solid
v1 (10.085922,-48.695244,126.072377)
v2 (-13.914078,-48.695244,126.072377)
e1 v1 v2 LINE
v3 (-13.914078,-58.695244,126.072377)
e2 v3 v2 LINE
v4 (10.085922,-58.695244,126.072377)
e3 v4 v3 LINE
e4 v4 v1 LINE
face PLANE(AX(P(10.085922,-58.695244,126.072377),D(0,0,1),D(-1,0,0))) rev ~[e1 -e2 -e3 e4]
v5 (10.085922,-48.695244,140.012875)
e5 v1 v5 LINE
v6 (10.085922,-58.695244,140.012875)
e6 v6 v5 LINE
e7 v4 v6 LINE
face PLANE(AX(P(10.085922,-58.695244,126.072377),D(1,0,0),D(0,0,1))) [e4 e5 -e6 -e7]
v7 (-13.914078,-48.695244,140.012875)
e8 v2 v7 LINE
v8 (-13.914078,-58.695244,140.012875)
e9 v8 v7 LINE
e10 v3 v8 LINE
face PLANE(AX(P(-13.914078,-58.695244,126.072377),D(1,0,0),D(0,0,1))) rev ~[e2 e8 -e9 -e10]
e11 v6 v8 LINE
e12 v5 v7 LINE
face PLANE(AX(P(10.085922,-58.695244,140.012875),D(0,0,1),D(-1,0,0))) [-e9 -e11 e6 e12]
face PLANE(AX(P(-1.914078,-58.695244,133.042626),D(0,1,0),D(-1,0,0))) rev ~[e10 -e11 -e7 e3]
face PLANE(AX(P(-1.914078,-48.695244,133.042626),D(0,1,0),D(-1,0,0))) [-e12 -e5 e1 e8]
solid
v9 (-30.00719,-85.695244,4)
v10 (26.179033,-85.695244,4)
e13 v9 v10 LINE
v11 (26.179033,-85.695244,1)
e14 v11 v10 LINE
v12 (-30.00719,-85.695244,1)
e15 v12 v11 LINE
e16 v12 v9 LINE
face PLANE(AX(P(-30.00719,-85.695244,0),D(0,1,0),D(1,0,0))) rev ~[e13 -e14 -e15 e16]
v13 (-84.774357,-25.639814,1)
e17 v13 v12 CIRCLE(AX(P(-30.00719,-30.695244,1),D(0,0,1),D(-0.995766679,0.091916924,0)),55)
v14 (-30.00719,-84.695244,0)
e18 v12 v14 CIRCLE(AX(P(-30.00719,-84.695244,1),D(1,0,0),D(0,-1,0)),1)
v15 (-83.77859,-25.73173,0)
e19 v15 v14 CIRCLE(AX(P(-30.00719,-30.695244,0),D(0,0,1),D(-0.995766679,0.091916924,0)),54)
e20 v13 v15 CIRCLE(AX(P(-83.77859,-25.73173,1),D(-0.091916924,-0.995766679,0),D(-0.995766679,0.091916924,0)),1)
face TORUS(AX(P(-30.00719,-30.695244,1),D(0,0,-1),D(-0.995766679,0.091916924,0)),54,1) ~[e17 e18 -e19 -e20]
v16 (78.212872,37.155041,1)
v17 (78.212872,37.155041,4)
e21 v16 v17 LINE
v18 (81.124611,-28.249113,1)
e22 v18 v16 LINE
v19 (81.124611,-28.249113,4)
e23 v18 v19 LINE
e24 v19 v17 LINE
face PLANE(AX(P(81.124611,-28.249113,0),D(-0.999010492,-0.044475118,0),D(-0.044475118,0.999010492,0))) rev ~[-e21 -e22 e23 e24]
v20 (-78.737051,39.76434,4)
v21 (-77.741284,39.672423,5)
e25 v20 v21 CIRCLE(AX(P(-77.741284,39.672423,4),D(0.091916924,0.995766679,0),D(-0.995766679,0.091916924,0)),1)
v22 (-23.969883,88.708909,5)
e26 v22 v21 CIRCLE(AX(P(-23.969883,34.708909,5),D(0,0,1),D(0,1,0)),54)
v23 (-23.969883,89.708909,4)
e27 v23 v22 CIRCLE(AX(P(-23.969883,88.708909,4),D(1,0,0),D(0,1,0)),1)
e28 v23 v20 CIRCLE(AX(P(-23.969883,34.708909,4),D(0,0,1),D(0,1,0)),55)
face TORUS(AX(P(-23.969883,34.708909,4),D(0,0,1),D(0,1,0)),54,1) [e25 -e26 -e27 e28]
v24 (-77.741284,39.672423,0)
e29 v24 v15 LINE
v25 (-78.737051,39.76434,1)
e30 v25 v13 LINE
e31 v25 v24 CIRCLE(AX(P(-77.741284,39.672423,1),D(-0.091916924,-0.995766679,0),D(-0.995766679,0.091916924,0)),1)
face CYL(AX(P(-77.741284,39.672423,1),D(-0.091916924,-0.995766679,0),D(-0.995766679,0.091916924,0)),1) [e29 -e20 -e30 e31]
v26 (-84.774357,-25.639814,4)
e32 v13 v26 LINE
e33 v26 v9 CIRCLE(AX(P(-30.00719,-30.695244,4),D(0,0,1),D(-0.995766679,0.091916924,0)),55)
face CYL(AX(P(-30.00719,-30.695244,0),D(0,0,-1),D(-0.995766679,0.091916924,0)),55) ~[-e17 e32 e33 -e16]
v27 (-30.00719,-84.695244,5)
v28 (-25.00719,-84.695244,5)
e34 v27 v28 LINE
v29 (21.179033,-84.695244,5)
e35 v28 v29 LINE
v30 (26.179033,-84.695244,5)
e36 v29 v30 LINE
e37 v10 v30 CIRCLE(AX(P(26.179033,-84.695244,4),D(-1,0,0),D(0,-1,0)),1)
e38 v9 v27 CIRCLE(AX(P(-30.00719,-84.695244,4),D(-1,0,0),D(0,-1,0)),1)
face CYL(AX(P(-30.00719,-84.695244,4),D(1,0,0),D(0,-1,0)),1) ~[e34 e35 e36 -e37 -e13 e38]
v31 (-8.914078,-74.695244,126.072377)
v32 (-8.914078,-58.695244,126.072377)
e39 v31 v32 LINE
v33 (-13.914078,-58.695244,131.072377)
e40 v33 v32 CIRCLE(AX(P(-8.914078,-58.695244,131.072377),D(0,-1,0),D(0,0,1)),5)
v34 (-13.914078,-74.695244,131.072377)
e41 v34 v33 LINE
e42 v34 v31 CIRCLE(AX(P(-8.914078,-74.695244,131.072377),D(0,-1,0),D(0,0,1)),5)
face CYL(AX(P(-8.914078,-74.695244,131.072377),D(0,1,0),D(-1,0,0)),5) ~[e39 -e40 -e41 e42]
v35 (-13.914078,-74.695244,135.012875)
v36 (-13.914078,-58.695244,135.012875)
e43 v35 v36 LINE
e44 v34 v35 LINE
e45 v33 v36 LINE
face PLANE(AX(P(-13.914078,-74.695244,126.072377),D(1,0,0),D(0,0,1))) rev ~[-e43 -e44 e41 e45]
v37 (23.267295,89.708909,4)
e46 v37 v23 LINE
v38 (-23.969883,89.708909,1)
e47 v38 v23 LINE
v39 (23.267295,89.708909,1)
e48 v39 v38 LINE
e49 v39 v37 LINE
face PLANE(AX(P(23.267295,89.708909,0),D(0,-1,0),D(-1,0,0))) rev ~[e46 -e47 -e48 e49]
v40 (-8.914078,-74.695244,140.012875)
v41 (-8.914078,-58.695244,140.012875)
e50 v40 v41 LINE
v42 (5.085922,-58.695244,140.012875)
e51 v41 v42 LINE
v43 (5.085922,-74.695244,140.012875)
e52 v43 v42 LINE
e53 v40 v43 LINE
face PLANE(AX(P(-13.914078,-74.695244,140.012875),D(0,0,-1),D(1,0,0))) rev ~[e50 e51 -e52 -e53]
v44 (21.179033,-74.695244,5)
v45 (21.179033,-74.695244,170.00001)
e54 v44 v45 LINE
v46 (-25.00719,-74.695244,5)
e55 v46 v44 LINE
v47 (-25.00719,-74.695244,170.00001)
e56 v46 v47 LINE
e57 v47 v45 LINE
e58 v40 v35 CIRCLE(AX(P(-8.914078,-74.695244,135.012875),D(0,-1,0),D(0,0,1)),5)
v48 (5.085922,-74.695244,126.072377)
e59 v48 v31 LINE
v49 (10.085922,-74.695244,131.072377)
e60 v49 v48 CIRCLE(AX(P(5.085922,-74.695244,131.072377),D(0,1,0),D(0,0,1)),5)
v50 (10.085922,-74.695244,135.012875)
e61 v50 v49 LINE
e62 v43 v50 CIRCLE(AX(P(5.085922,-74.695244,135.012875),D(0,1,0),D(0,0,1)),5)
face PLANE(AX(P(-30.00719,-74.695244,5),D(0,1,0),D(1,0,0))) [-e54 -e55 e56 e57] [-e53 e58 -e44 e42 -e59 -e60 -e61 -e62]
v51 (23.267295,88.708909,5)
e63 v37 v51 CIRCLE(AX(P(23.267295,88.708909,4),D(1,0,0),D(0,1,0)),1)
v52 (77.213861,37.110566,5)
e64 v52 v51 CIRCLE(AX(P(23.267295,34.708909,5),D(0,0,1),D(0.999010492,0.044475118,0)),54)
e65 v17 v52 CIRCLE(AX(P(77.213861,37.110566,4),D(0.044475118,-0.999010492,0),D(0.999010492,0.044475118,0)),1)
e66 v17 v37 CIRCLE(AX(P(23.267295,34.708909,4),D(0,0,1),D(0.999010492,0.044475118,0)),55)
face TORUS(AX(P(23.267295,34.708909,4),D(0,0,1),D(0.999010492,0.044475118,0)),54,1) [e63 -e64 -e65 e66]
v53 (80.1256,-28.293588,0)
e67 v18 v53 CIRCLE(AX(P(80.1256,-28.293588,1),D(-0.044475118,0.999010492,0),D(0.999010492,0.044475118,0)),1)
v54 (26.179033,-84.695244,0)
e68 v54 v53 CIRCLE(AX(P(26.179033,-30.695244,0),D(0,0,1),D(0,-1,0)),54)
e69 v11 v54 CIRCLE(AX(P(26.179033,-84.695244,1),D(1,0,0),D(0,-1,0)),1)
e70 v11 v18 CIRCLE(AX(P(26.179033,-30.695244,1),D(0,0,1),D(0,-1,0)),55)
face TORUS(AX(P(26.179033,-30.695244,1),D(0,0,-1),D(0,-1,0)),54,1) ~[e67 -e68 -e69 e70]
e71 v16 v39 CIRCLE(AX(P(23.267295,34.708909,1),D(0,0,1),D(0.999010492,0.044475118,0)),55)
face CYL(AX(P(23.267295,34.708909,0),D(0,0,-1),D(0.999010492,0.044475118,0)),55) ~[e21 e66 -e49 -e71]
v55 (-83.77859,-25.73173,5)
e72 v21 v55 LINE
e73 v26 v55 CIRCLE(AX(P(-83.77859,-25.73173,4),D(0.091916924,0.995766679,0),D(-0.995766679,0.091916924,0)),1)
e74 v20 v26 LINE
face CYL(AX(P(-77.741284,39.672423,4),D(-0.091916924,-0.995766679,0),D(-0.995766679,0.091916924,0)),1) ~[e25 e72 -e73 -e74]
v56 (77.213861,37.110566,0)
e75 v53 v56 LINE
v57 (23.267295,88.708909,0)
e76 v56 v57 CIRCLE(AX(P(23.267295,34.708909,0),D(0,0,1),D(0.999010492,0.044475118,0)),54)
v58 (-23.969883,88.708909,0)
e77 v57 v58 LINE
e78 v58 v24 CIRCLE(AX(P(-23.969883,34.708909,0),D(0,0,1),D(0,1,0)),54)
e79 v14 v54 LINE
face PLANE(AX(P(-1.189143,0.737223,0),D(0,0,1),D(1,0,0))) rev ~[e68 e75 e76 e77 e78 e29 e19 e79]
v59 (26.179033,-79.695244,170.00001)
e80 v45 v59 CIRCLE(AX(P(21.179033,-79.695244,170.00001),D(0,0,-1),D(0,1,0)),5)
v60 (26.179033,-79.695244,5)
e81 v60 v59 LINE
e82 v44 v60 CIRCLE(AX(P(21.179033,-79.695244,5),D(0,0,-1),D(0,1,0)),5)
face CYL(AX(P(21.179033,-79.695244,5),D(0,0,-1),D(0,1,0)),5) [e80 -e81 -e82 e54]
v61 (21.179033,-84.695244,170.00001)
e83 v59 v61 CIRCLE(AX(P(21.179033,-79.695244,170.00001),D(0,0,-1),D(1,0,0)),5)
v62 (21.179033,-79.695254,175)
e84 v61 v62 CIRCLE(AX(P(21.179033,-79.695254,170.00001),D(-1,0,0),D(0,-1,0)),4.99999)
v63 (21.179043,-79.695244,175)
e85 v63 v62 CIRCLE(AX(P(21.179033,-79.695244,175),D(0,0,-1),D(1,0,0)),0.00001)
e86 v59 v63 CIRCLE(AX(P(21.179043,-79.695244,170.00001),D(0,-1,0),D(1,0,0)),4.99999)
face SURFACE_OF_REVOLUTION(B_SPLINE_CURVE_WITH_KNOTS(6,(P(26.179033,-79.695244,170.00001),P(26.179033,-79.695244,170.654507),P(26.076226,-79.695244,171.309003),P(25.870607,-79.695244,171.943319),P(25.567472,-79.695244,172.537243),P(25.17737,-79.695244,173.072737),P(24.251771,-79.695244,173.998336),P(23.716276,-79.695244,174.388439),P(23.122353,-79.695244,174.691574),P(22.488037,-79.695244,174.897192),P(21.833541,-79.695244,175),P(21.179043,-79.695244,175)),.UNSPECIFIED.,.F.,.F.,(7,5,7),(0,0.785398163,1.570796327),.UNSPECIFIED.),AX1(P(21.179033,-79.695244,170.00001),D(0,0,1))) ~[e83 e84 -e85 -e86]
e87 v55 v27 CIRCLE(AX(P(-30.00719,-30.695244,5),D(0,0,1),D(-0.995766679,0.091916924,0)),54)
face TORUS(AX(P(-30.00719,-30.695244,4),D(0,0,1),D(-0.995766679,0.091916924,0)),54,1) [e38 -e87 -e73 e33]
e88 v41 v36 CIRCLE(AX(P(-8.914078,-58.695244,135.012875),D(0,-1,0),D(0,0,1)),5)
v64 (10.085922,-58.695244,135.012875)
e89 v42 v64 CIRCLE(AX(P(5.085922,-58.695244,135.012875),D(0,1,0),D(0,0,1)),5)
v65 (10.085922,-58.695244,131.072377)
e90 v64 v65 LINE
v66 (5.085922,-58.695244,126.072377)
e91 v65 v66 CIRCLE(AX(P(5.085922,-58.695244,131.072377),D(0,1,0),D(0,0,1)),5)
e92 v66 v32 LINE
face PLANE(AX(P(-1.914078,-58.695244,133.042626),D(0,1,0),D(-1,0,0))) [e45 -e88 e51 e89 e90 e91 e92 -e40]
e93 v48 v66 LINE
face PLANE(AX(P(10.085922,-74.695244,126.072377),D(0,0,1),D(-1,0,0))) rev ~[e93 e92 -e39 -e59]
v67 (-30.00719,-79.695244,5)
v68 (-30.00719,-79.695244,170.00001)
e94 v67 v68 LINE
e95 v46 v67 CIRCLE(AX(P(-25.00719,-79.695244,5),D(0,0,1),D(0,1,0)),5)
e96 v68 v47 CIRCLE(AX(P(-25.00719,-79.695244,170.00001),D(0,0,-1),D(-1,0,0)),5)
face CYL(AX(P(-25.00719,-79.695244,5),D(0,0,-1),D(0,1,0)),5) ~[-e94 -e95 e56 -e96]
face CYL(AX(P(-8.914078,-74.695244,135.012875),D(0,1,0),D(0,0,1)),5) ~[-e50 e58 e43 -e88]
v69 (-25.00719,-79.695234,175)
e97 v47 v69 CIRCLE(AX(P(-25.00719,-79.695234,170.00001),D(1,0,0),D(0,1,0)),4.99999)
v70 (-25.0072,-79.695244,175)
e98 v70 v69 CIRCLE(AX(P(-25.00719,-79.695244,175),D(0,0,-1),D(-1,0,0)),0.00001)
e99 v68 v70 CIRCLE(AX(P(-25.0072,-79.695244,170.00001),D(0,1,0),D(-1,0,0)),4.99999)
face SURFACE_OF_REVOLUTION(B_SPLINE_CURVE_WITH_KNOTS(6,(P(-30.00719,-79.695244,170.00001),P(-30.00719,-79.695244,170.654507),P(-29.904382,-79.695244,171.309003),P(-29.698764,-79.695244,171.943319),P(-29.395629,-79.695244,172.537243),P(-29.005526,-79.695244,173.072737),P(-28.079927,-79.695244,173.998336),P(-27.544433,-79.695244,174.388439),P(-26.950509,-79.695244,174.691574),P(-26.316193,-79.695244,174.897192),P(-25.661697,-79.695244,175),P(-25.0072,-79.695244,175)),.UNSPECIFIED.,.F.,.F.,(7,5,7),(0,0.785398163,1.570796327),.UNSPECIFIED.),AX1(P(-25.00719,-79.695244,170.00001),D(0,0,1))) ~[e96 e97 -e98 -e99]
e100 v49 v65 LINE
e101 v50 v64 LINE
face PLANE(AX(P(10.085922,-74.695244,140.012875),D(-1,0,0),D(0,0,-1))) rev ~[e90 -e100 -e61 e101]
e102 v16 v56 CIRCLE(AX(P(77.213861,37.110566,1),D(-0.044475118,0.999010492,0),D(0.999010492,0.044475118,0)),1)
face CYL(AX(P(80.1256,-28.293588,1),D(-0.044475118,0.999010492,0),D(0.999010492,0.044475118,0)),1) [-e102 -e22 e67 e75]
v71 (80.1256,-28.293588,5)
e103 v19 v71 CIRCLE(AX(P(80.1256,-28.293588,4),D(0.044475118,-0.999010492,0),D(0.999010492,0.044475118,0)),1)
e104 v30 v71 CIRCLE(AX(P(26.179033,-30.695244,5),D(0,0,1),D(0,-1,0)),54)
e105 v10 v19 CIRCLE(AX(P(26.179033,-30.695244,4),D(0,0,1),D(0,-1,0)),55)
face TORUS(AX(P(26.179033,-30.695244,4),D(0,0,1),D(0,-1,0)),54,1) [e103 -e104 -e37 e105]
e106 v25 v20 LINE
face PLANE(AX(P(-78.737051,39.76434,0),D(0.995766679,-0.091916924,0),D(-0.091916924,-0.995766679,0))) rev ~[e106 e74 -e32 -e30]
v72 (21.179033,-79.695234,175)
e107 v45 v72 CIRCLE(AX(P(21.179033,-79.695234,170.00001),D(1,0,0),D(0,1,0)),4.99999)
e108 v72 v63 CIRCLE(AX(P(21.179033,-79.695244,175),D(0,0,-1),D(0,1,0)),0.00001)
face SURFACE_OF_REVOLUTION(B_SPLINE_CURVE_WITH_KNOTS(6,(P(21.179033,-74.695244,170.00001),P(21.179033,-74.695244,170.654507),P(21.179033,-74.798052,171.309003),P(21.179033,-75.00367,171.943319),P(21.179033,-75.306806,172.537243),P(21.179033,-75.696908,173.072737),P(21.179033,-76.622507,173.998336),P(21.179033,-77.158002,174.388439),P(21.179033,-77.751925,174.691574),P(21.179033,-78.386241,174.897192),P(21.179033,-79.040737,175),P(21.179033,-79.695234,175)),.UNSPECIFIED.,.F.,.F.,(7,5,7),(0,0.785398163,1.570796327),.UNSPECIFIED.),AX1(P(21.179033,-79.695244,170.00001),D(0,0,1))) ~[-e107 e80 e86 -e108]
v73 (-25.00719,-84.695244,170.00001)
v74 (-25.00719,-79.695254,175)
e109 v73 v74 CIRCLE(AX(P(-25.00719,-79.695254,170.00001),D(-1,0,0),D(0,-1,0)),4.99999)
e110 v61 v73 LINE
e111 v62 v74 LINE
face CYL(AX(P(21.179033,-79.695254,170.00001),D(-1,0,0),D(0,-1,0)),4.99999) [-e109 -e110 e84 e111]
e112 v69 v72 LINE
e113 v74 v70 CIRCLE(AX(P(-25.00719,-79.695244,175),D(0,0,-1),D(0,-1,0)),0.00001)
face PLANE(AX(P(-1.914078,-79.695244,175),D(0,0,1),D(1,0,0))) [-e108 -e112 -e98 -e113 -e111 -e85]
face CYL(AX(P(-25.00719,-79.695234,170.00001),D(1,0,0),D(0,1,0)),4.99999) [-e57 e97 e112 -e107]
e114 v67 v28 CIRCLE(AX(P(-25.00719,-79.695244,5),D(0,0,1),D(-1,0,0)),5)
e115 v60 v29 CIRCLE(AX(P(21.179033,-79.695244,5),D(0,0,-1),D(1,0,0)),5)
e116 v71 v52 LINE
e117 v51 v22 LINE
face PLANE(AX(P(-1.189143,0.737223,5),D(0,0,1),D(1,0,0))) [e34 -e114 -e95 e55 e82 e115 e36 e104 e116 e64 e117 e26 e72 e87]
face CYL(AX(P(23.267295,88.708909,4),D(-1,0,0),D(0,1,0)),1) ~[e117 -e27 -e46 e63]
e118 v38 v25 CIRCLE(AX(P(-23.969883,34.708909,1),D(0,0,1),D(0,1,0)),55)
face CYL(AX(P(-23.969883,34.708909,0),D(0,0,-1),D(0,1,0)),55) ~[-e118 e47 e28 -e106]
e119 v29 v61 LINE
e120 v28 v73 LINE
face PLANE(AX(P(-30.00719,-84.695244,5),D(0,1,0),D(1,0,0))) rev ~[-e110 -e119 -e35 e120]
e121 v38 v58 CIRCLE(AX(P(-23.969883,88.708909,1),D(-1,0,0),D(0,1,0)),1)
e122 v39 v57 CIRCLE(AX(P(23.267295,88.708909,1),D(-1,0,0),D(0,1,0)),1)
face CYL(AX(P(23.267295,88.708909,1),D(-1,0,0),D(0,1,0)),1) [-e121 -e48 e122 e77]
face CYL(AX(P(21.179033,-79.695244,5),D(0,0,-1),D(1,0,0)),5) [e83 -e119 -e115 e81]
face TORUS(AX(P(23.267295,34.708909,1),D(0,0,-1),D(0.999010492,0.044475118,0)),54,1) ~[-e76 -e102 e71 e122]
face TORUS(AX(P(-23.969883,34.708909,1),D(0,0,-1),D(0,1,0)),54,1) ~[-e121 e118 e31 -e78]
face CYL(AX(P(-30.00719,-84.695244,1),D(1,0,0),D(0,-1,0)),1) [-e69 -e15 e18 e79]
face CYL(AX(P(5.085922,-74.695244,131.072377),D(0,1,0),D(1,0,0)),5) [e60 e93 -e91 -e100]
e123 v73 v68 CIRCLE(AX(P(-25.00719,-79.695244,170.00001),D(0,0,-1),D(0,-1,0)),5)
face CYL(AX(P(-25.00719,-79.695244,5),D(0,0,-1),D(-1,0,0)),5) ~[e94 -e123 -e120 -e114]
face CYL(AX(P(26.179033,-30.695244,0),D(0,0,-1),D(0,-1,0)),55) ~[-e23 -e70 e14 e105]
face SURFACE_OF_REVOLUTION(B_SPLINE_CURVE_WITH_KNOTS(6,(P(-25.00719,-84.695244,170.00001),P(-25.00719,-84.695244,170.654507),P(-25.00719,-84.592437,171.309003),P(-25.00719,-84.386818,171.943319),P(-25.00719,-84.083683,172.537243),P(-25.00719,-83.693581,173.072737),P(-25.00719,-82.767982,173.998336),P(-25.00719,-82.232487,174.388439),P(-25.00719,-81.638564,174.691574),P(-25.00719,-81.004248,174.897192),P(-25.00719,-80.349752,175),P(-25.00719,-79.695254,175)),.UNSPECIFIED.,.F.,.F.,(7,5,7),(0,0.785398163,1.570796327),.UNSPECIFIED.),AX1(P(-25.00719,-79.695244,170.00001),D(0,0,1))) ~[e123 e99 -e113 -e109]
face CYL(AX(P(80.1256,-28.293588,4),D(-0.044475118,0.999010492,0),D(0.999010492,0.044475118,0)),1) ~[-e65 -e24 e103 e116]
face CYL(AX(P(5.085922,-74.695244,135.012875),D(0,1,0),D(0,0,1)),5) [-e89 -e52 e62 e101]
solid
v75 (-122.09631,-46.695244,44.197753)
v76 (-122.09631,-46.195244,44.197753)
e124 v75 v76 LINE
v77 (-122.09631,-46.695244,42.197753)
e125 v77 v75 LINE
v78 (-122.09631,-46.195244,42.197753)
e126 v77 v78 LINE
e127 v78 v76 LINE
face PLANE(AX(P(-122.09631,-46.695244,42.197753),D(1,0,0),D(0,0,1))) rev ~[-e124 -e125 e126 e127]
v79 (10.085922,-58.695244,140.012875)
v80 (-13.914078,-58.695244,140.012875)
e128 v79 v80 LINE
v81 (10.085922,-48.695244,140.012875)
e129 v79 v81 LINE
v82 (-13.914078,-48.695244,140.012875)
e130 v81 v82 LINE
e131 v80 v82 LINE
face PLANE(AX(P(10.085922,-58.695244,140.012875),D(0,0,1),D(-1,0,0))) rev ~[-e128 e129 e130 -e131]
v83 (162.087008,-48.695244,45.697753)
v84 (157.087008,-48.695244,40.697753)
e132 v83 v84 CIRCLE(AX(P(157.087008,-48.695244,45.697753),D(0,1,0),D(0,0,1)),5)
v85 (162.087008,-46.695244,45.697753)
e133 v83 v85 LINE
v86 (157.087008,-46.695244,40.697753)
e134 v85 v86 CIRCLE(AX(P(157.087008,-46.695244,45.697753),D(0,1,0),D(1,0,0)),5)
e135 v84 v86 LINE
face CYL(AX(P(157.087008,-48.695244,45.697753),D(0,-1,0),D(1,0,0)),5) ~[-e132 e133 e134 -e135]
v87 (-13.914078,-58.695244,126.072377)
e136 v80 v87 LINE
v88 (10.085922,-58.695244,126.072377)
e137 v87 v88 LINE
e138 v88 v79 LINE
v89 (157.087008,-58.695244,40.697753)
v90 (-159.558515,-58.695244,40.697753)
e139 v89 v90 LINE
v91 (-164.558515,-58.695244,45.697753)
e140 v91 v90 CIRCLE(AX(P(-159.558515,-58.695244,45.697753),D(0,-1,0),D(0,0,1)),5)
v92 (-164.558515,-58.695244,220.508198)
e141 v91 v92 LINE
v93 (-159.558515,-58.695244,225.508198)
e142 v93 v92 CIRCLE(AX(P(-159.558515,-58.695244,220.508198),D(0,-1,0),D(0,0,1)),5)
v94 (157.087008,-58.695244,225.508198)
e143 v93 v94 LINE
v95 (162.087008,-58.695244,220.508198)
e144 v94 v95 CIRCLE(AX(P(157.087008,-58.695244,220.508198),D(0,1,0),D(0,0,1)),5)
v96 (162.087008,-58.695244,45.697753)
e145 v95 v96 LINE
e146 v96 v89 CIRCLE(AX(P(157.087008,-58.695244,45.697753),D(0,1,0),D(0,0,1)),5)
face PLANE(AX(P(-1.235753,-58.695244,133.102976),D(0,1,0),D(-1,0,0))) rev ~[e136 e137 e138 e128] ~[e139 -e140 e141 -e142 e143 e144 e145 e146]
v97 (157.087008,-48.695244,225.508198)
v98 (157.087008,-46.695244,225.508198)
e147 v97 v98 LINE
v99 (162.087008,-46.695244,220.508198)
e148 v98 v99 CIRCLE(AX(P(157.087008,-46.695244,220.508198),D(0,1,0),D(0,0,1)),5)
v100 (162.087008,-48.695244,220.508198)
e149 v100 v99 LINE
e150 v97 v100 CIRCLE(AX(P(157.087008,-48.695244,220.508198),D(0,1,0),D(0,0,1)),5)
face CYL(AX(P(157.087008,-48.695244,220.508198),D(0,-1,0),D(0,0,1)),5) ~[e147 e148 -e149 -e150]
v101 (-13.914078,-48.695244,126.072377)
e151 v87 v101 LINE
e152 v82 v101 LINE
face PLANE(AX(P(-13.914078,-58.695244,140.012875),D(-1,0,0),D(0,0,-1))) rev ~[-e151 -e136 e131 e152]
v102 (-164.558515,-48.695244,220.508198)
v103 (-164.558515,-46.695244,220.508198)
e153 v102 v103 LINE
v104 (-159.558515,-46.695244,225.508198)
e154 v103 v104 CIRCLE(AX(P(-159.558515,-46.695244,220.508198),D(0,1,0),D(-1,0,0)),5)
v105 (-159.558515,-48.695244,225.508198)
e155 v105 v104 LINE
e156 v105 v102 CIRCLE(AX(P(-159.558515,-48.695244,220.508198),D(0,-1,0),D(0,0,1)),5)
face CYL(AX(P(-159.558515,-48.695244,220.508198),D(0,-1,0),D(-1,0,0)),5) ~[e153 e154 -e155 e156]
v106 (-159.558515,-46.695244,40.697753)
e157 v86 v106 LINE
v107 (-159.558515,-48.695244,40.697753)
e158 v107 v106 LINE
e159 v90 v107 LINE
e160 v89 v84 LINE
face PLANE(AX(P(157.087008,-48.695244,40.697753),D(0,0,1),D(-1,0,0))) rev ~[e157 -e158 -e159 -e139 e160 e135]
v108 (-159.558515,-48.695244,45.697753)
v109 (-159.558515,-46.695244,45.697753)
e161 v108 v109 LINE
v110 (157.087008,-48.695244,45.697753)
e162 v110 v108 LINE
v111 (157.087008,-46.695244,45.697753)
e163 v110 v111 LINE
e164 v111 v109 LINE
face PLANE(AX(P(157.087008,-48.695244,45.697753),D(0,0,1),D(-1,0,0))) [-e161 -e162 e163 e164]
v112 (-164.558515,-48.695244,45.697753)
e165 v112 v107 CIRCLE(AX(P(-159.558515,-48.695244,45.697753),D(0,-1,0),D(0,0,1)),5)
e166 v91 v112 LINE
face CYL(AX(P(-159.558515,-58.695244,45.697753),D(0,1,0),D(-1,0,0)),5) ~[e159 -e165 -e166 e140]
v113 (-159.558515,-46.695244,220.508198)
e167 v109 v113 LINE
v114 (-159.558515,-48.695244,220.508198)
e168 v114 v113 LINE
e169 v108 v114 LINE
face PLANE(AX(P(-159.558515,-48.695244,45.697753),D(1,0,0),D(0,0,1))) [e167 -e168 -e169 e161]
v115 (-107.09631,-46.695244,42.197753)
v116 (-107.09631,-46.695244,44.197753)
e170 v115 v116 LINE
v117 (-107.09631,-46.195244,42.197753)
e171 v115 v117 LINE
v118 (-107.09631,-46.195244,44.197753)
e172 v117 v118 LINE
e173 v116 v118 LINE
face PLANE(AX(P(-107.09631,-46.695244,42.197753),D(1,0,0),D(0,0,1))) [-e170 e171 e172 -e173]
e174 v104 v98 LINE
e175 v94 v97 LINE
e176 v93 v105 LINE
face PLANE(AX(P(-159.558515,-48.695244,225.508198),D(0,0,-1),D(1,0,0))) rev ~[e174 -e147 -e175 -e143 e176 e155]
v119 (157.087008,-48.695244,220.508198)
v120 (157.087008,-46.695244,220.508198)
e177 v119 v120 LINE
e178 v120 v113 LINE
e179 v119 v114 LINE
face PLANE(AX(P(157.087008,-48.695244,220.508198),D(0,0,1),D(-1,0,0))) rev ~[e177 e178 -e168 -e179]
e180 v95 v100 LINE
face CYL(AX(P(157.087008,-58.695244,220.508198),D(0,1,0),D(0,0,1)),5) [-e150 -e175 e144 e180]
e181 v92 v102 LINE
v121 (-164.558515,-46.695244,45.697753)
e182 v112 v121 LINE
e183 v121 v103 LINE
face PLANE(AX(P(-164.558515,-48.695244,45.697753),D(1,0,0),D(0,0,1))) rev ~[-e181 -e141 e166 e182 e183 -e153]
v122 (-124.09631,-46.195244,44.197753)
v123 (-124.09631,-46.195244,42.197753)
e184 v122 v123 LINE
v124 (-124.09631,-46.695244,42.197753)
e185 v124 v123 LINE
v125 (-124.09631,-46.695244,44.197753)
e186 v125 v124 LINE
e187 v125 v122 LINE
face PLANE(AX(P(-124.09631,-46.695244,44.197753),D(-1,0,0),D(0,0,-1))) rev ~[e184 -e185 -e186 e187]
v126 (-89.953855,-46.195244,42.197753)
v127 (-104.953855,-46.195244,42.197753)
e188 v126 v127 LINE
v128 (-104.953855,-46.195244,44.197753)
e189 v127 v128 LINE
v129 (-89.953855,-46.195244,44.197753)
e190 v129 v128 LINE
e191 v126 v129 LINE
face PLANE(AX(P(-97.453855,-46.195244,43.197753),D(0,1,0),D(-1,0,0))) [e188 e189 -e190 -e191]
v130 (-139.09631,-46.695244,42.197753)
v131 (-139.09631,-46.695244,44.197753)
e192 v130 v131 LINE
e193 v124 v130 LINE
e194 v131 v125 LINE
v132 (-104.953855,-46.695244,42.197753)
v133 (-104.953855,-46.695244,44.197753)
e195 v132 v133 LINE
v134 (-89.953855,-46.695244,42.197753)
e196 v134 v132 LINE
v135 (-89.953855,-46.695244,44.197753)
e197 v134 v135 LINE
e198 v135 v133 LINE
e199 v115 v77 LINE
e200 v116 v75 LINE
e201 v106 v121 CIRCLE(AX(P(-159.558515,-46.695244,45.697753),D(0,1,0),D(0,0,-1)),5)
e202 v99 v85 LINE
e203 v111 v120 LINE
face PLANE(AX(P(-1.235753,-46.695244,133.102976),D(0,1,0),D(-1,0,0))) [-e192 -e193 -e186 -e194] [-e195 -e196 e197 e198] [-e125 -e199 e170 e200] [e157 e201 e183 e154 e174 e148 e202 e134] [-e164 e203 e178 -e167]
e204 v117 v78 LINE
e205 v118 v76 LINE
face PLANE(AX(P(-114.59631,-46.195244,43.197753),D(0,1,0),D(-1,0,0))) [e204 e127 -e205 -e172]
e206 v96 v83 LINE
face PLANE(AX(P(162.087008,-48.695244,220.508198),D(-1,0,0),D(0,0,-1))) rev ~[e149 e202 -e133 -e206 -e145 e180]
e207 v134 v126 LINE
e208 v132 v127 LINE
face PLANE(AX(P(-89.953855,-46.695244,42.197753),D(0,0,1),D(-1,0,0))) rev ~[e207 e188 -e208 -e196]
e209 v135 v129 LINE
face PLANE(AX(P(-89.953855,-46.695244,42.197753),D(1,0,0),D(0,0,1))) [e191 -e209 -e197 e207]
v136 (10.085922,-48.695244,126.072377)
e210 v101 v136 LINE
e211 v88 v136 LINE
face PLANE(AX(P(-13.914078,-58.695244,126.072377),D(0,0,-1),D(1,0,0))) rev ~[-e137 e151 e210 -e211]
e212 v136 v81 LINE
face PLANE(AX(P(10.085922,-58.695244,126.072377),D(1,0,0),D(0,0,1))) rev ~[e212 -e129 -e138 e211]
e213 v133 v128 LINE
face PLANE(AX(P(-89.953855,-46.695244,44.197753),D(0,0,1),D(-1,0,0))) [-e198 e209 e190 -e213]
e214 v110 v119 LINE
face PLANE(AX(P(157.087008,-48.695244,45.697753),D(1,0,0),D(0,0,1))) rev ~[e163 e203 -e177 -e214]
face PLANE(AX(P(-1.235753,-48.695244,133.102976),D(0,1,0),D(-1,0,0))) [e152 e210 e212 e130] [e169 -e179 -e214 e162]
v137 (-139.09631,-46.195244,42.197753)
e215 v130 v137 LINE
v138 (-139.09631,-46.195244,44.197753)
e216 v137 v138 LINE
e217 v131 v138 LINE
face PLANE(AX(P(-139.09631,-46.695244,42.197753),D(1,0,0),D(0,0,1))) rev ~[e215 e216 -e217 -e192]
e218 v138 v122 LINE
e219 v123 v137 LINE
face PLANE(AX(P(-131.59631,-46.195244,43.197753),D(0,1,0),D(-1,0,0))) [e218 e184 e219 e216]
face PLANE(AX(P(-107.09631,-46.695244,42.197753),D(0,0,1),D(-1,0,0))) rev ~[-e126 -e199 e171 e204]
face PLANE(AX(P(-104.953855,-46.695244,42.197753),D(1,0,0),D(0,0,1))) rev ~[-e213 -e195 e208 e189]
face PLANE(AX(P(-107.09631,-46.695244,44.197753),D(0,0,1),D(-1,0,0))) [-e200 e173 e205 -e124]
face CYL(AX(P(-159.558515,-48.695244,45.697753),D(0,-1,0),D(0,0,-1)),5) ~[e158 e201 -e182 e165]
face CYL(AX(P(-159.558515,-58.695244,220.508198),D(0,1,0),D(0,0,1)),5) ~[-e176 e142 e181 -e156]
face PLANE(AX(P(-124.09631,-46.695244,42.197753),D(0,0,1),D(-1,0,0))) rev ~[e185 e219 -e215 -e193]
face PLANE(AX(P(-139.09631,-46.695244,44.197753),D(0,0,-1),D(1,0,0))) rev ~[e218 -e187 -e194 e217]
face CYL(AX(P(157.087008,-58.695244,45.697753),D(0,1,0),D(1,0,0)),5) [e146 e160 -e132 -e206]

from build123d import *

# Parameters (mm, degrees)
F1_DEPTH    = 5
F2_R        = 1
F3_W        = 56.1862232486
F3_H        = 10
F4_DEPTH    = 170
F5_T1_DEPTH = 170
F6_T1_DEPTH = 170
F8_DEPTH    = 16
F9_R        = 4.99999
F11_DEPTH   = 10
F12_W       = 24
F12_H       = 13.9404982328
F13_DEPTH   = 10
F14_R       = 5
F15_R       = 5
F16_W       = 316.6455233097
F16_H       = 174.8104447126
F17_DEPTH   = 2
F18_W       = 15
F18_H       = 2
F19_DEPTH   = 0.5
F20_R       = 5
F21_R       = 5


# Not quite as in the source:
# - a fillet or chamfer that OpenCascade refuses, or shapes differently, is made with other operations: its cross-section is extruded or revolved along the edge and cut away or added
# - a fillet or chamfer is up to 0.001 mm smaller than in the source, because OpenCascade refuses the exact size


with BuildPart() as f1:
    # F0 (on Top) → F1 (new body)
    with BuildSketch(Plane.XY):
        with BuildLine():
            Line((23.2672947912, 89.7089094173), (-23.969883312, 89.7089094173))
            ThreePointArc((-23.969883312, 89.7089094173), (-61.030315745, 75.3478605341), (-78.737050658, 39.7643402492))
            Line((-78.737050658, 39.7643402492), (-84.7743571616, -25.63981354))
            ThreePointArc((-84.7743571616, -25.63981354), (-70.6461409325, -67.7556768049), (-30.0071898156, -85.6952443719))
            Line((-30.0071898156, -85.6952443719), (26.1790334329, -85.6952443719))
            ThreePointArc((26.1790334329, -85.6952443719), (65.9253366057, -68.7114433416), (81.1246105138, -28.2491128847))
            Line((81.1246105138, -28.2491128847), (78.2128718721, 37.1550409045))
            ThreePointArc((78.2128718721, 37.1550409045), (61.2834937609, 74.45521259), (23.2672947912, 89.7089094173))
        make_face()
    extrude(amount=F1_DEPTH)

    # F2
    f2_edges = [f1.edges().sort_by_distance(p)[0] for p in [
        (79.668741, 4.452964, 0),
        (61.283494, 74.455213, 0),
        (-0.351294, 89.708909, 0),
        (-61.030316, 75.347861, 0),
        (-81.755704, 7.062263, 0),
        (-70.646141, -67.755677, 0),
        (-1.914078, -85.695244, 0),
        (65.925337, -68.711443, 0),
        (79.668741, 4.452964, 5),
        (61.283494, 74.455213, 5),
        (-0.351294, 89.708909, 5),
        (-61.030316, 75.347861, 5),
        (-81.755704, 7.062263, 5),
        (-70.646141, -67.755677, 5),
        (-1.914078, -85.695244, 5),
        (65.925337, -68.711443, 5),
    ]]
    fillet(f2_edges, radius=F2_R)

    # F3 (on face) → F4 (join)
    with BuildSketch(Plane.XY.offset(5)):
        with Locations((-1.9140781913, -79.6952443719)):
            Rectangle(F3_W, F3_H)
    extrude(amount=F4_DEPTH)

    # F5: fillet of radius 5 on 1 edges, made by hand

    # F5_s2 → F5_t1 (cut)
    with BuildSketch(Plane.XY.offset(5)):
        with BuildLine():
            ThreePointArc((26.1790334329, -79.6952443719), (24.7145673389, -83.2307782778), (21.1790334329, -84.6952443719))
            Line((21.1790334329, -84.6952443719), (21.1790334329, -84.7952443719))
            Line((21.1790334329, -84.7952443719), (26.2790334329, -84.7952443719))
            Line((26.2790334329, -84.7952443719), (26.2790334329, -79.6952443719))
            Line((26.2790334329, -79.6952443719), (26.1790334329, -79.6952443719))
        make_face()
    extrude(amount=F5_T1_DEPTH, mode=Mode.SUBTRACT)

    # F6: fillet of radius 5 on 3 edges, made by hand

    # F6_s2 → F6_t1 (cut)
    with BuildSketch(Plane.XY.offset(5)):
        with BuildLine():
            ThreePointArc((21.1790334329, -74.6952443719), (24.7145673389, -76.159710466), (26.1790334329, -79.6952443719))
            Line((26.1790334329, -79.6952443719), (26.2790334329, -79.6952443719))
            Line((26.2790334329, -79.6952443719), (26.2790334329, -74.5952443719))
            Line((26.2790334329, -74.5952443719), (21.1790334329, -74.5952443719))
            Line((21.1790334329, -74.5952443719), (21.1790334329, -74.6952443719))
        make_face()
        with BuildLine():
            ThreePointArc((-25.0071898156, -74.6952443719), (-28.5427237216, -76.159710466), (-30.0071898156, -79.6952443719))
            Line((-30.0071898156, -79.6952443719), (-30.1071898156, -79.6952443719))
            Line((-30.1071898156, -79.6952443719), (-30.1071898156, -74.5952443719))
            Line((-30.1071898156, -74.5952443719), (-25.0071898156, -74.5952443719))
            Line((-25.0071898156, -74.5952443719), (-25.0071898156, -74.6952443719))
        make_face()
        with BuildLine():
            ThreePointArc((-30.0071898156, -79.6952443719), (-28.5427237216, -83.2307782778), (-25.0071898156, -84.6952443719))
            Line((-25.0071898156, -84.6952443719), (-25.0071898156, -84.7952443719))
            Line((-25.0071898156, -84.7952443719), (-30.1071898156, -84.7952443719))
            Line((-30.1071898156, -84.7952443719), (-30.1071898156, -79.6952443719))
            Line((-30.1071898156, -79.6952443719), (-30.0071898156, -79.6952443719))
        make_face()
    extrude(amount=F6_T1_DEPTH, mode=Mode.SUBTRACT)

    # F7 (on face) → F8 (join)
    with BuildSketch(Plane(origin=(0, -74.6952443719, 0), x_dir=(-1, 0, 0), z_dir=(0, 1, 0))):
        Polygon((13.9140781913, 140.0128751993), (1.9140781913, 140.0128751993), (-10.0859218087, 140.0128751993), (-10.0859218087, 126.0723769665), (13.9140781913, 126.0723769665), align=None)
    extrude(amount=F8_DEPTH)

    # F9 (radius 5 in the source; OpenCascade refuses exactly that, so slightly less here)
    f9_edges = [f1.edges().sort_by_distance(p)[0] for p in [
        (-1.914078, -74.695244, 175),
        (-28.542724, -76.15971, 175),
        (24.714567, -76.15971, 175),
        (24.714567, -83.230778, 175),
        (-1.914078, -84.695244, 175),
        (-28.542724, -83.230778, 175),
    ]]
    fillet(f9_edges, radius=F9_R)

    # F20
    f20_edges = [f1.edges().sort_by_distance(p)[0] for p in [
        (-13.914078, -66.695244, 140.012875),
    ]]
    fillet(f20_edges, radius=F20_R)

    # F21
    f21_edges = [f1.edges().sort_by_distance(p)[0] for p in [
        (-13.914078, -66.695244, 126.072377),
        (10.085922, -66.695244, 140.012875),
        (10.085922, -66.695244, 126.072377),
    ]]
    fillet(f21_edges, radius=F21_R)


with BuildPart() as f11:
    # F10 (on face) → F11 (new body)
    with BuildSketch(Plane(origin=(0, -58.6952443719, 0), x_dir=(-1, 0, 0), z_dir=(0, 1, 0))):
        Polygon((164.5585149527, 225.5081981421), (1.9140781913, 225.5081981421), (-162.087008357, 225.5081981421), (-162.087008357, 40.6977534294), (-160.0567102432, 40.6977534294), (164.5585149527, 40.6977534294), align=None)
        Polygon((-10.0859218087, 140.0128751993), (1.9140781913, 140.0128751993), (13.9140781913, 140.0128751993), (13.9140781913, 126.0723769665), (-10.0859218087, 126.0723769665), align=None, mode=Mode.SUBTRACT)
    extrude(amount=F11_DEPTH)

    # F14
    f14_edges = [f11.edges().sort_by_distance(p)[0] for p in [
        (162.087008, -53.695244, 225.508198),
    ]]
    fillet(f14_edges, radius=F14_R)

    # F15
    f15_edges = [f11.edges().sort_by_distance(p)[0] for p in [
        (-164.558515, -53.695244, 225.508198),
        (-164.558515, -53.695244, 40.697753),
        (162.087008, -53.695244, 40.697753),
    ]]
    fillet(f15_edges, radius=F15_R)

    # F16 (on face) → F17 (join)
    with BuildSketch(Plane(origin=(0, -48.6952443719, 0), x_dir=(-1, 0, 0), z_dir=(0, 1, 0))):
        with BuildLine():
            ThreePointArc((164.5585149527, 220.5081981421), (163.0940488586, 224.043732048), (159.5585149527, 225.5081981421))
            Line((159.5585149527, 225.5081981421), (-157.087008357, 225.5081981421))
            ThreePointArc((-157.087008357, 225.5081981421), (-160.622542263, 224.043732048), (-162.087008357, 220.5081981421))
            Line((-162.087008357, 220.5081981421), (-162.087008357, 45.6977534294))
            ThreePointArc((-162.087008357, 45.6977534294), (-160.622542263, 42.1622195235), (-157.087008357, 40.6977534294))
            Line((-157.087008357, 40.6977534294), (159.5585149527, 40.6977534294))
            ThreePointArc((159.5585149527, 40.6977534294), (163.0940488586, 42.1622195235), (164.5585149527, 45.6977534294))
            Line((164.5585149527, 45.6977534294), (164.5585149527, 220.5081981421))
        make_face()
        with Locations((1.2357532978, 133.1029757857)):
            Rectangle(F16_W, F16_H, mode=Mode.SUBTRACT)
    extrude(amount=F17_DEPTH)

    # F18 (on face) → F19 (join)
    with BuildSketch(Plane(origin=(0, -46.6952443719, 0), x_dir=(-1, 0, 0), z_dir=(0, 1, 0))):
        with Locations((97.4538546801, 43.1977534294)):
            Rectangle(F18_W, F18_H)
        with Locations((114.5963103771, 43.1977534294)):
            Rectangle(F18_W, F18_H)
        Polygon((139.0963103771, 42.1977534294), (139.0963103771, 44.1977534294), (129.0963103771, 44.1977534294), (124.0963103771, 44.1977534294), (124.0963103771, 42.1977534294), (130.4579966664, 42.1977534294), align=None)
    extrude(amount=F19_DEPTH)


with BuildPart() as f13:
    # F12 (on face) → F13 (new body)
    with BuildSketch(Plane(origin=(0, -58.6952443719, 0), x_dir=(-1, 0, 0), z_dir=(0, 1, 0))):
        with Locations((1.9140781913, 133.0426260829)):
            Rectangle(F12_W, F12_H)
    extrude(amount=F13_DEPTH)


solid = Compound([f1.part, f11.part, f13.part])
